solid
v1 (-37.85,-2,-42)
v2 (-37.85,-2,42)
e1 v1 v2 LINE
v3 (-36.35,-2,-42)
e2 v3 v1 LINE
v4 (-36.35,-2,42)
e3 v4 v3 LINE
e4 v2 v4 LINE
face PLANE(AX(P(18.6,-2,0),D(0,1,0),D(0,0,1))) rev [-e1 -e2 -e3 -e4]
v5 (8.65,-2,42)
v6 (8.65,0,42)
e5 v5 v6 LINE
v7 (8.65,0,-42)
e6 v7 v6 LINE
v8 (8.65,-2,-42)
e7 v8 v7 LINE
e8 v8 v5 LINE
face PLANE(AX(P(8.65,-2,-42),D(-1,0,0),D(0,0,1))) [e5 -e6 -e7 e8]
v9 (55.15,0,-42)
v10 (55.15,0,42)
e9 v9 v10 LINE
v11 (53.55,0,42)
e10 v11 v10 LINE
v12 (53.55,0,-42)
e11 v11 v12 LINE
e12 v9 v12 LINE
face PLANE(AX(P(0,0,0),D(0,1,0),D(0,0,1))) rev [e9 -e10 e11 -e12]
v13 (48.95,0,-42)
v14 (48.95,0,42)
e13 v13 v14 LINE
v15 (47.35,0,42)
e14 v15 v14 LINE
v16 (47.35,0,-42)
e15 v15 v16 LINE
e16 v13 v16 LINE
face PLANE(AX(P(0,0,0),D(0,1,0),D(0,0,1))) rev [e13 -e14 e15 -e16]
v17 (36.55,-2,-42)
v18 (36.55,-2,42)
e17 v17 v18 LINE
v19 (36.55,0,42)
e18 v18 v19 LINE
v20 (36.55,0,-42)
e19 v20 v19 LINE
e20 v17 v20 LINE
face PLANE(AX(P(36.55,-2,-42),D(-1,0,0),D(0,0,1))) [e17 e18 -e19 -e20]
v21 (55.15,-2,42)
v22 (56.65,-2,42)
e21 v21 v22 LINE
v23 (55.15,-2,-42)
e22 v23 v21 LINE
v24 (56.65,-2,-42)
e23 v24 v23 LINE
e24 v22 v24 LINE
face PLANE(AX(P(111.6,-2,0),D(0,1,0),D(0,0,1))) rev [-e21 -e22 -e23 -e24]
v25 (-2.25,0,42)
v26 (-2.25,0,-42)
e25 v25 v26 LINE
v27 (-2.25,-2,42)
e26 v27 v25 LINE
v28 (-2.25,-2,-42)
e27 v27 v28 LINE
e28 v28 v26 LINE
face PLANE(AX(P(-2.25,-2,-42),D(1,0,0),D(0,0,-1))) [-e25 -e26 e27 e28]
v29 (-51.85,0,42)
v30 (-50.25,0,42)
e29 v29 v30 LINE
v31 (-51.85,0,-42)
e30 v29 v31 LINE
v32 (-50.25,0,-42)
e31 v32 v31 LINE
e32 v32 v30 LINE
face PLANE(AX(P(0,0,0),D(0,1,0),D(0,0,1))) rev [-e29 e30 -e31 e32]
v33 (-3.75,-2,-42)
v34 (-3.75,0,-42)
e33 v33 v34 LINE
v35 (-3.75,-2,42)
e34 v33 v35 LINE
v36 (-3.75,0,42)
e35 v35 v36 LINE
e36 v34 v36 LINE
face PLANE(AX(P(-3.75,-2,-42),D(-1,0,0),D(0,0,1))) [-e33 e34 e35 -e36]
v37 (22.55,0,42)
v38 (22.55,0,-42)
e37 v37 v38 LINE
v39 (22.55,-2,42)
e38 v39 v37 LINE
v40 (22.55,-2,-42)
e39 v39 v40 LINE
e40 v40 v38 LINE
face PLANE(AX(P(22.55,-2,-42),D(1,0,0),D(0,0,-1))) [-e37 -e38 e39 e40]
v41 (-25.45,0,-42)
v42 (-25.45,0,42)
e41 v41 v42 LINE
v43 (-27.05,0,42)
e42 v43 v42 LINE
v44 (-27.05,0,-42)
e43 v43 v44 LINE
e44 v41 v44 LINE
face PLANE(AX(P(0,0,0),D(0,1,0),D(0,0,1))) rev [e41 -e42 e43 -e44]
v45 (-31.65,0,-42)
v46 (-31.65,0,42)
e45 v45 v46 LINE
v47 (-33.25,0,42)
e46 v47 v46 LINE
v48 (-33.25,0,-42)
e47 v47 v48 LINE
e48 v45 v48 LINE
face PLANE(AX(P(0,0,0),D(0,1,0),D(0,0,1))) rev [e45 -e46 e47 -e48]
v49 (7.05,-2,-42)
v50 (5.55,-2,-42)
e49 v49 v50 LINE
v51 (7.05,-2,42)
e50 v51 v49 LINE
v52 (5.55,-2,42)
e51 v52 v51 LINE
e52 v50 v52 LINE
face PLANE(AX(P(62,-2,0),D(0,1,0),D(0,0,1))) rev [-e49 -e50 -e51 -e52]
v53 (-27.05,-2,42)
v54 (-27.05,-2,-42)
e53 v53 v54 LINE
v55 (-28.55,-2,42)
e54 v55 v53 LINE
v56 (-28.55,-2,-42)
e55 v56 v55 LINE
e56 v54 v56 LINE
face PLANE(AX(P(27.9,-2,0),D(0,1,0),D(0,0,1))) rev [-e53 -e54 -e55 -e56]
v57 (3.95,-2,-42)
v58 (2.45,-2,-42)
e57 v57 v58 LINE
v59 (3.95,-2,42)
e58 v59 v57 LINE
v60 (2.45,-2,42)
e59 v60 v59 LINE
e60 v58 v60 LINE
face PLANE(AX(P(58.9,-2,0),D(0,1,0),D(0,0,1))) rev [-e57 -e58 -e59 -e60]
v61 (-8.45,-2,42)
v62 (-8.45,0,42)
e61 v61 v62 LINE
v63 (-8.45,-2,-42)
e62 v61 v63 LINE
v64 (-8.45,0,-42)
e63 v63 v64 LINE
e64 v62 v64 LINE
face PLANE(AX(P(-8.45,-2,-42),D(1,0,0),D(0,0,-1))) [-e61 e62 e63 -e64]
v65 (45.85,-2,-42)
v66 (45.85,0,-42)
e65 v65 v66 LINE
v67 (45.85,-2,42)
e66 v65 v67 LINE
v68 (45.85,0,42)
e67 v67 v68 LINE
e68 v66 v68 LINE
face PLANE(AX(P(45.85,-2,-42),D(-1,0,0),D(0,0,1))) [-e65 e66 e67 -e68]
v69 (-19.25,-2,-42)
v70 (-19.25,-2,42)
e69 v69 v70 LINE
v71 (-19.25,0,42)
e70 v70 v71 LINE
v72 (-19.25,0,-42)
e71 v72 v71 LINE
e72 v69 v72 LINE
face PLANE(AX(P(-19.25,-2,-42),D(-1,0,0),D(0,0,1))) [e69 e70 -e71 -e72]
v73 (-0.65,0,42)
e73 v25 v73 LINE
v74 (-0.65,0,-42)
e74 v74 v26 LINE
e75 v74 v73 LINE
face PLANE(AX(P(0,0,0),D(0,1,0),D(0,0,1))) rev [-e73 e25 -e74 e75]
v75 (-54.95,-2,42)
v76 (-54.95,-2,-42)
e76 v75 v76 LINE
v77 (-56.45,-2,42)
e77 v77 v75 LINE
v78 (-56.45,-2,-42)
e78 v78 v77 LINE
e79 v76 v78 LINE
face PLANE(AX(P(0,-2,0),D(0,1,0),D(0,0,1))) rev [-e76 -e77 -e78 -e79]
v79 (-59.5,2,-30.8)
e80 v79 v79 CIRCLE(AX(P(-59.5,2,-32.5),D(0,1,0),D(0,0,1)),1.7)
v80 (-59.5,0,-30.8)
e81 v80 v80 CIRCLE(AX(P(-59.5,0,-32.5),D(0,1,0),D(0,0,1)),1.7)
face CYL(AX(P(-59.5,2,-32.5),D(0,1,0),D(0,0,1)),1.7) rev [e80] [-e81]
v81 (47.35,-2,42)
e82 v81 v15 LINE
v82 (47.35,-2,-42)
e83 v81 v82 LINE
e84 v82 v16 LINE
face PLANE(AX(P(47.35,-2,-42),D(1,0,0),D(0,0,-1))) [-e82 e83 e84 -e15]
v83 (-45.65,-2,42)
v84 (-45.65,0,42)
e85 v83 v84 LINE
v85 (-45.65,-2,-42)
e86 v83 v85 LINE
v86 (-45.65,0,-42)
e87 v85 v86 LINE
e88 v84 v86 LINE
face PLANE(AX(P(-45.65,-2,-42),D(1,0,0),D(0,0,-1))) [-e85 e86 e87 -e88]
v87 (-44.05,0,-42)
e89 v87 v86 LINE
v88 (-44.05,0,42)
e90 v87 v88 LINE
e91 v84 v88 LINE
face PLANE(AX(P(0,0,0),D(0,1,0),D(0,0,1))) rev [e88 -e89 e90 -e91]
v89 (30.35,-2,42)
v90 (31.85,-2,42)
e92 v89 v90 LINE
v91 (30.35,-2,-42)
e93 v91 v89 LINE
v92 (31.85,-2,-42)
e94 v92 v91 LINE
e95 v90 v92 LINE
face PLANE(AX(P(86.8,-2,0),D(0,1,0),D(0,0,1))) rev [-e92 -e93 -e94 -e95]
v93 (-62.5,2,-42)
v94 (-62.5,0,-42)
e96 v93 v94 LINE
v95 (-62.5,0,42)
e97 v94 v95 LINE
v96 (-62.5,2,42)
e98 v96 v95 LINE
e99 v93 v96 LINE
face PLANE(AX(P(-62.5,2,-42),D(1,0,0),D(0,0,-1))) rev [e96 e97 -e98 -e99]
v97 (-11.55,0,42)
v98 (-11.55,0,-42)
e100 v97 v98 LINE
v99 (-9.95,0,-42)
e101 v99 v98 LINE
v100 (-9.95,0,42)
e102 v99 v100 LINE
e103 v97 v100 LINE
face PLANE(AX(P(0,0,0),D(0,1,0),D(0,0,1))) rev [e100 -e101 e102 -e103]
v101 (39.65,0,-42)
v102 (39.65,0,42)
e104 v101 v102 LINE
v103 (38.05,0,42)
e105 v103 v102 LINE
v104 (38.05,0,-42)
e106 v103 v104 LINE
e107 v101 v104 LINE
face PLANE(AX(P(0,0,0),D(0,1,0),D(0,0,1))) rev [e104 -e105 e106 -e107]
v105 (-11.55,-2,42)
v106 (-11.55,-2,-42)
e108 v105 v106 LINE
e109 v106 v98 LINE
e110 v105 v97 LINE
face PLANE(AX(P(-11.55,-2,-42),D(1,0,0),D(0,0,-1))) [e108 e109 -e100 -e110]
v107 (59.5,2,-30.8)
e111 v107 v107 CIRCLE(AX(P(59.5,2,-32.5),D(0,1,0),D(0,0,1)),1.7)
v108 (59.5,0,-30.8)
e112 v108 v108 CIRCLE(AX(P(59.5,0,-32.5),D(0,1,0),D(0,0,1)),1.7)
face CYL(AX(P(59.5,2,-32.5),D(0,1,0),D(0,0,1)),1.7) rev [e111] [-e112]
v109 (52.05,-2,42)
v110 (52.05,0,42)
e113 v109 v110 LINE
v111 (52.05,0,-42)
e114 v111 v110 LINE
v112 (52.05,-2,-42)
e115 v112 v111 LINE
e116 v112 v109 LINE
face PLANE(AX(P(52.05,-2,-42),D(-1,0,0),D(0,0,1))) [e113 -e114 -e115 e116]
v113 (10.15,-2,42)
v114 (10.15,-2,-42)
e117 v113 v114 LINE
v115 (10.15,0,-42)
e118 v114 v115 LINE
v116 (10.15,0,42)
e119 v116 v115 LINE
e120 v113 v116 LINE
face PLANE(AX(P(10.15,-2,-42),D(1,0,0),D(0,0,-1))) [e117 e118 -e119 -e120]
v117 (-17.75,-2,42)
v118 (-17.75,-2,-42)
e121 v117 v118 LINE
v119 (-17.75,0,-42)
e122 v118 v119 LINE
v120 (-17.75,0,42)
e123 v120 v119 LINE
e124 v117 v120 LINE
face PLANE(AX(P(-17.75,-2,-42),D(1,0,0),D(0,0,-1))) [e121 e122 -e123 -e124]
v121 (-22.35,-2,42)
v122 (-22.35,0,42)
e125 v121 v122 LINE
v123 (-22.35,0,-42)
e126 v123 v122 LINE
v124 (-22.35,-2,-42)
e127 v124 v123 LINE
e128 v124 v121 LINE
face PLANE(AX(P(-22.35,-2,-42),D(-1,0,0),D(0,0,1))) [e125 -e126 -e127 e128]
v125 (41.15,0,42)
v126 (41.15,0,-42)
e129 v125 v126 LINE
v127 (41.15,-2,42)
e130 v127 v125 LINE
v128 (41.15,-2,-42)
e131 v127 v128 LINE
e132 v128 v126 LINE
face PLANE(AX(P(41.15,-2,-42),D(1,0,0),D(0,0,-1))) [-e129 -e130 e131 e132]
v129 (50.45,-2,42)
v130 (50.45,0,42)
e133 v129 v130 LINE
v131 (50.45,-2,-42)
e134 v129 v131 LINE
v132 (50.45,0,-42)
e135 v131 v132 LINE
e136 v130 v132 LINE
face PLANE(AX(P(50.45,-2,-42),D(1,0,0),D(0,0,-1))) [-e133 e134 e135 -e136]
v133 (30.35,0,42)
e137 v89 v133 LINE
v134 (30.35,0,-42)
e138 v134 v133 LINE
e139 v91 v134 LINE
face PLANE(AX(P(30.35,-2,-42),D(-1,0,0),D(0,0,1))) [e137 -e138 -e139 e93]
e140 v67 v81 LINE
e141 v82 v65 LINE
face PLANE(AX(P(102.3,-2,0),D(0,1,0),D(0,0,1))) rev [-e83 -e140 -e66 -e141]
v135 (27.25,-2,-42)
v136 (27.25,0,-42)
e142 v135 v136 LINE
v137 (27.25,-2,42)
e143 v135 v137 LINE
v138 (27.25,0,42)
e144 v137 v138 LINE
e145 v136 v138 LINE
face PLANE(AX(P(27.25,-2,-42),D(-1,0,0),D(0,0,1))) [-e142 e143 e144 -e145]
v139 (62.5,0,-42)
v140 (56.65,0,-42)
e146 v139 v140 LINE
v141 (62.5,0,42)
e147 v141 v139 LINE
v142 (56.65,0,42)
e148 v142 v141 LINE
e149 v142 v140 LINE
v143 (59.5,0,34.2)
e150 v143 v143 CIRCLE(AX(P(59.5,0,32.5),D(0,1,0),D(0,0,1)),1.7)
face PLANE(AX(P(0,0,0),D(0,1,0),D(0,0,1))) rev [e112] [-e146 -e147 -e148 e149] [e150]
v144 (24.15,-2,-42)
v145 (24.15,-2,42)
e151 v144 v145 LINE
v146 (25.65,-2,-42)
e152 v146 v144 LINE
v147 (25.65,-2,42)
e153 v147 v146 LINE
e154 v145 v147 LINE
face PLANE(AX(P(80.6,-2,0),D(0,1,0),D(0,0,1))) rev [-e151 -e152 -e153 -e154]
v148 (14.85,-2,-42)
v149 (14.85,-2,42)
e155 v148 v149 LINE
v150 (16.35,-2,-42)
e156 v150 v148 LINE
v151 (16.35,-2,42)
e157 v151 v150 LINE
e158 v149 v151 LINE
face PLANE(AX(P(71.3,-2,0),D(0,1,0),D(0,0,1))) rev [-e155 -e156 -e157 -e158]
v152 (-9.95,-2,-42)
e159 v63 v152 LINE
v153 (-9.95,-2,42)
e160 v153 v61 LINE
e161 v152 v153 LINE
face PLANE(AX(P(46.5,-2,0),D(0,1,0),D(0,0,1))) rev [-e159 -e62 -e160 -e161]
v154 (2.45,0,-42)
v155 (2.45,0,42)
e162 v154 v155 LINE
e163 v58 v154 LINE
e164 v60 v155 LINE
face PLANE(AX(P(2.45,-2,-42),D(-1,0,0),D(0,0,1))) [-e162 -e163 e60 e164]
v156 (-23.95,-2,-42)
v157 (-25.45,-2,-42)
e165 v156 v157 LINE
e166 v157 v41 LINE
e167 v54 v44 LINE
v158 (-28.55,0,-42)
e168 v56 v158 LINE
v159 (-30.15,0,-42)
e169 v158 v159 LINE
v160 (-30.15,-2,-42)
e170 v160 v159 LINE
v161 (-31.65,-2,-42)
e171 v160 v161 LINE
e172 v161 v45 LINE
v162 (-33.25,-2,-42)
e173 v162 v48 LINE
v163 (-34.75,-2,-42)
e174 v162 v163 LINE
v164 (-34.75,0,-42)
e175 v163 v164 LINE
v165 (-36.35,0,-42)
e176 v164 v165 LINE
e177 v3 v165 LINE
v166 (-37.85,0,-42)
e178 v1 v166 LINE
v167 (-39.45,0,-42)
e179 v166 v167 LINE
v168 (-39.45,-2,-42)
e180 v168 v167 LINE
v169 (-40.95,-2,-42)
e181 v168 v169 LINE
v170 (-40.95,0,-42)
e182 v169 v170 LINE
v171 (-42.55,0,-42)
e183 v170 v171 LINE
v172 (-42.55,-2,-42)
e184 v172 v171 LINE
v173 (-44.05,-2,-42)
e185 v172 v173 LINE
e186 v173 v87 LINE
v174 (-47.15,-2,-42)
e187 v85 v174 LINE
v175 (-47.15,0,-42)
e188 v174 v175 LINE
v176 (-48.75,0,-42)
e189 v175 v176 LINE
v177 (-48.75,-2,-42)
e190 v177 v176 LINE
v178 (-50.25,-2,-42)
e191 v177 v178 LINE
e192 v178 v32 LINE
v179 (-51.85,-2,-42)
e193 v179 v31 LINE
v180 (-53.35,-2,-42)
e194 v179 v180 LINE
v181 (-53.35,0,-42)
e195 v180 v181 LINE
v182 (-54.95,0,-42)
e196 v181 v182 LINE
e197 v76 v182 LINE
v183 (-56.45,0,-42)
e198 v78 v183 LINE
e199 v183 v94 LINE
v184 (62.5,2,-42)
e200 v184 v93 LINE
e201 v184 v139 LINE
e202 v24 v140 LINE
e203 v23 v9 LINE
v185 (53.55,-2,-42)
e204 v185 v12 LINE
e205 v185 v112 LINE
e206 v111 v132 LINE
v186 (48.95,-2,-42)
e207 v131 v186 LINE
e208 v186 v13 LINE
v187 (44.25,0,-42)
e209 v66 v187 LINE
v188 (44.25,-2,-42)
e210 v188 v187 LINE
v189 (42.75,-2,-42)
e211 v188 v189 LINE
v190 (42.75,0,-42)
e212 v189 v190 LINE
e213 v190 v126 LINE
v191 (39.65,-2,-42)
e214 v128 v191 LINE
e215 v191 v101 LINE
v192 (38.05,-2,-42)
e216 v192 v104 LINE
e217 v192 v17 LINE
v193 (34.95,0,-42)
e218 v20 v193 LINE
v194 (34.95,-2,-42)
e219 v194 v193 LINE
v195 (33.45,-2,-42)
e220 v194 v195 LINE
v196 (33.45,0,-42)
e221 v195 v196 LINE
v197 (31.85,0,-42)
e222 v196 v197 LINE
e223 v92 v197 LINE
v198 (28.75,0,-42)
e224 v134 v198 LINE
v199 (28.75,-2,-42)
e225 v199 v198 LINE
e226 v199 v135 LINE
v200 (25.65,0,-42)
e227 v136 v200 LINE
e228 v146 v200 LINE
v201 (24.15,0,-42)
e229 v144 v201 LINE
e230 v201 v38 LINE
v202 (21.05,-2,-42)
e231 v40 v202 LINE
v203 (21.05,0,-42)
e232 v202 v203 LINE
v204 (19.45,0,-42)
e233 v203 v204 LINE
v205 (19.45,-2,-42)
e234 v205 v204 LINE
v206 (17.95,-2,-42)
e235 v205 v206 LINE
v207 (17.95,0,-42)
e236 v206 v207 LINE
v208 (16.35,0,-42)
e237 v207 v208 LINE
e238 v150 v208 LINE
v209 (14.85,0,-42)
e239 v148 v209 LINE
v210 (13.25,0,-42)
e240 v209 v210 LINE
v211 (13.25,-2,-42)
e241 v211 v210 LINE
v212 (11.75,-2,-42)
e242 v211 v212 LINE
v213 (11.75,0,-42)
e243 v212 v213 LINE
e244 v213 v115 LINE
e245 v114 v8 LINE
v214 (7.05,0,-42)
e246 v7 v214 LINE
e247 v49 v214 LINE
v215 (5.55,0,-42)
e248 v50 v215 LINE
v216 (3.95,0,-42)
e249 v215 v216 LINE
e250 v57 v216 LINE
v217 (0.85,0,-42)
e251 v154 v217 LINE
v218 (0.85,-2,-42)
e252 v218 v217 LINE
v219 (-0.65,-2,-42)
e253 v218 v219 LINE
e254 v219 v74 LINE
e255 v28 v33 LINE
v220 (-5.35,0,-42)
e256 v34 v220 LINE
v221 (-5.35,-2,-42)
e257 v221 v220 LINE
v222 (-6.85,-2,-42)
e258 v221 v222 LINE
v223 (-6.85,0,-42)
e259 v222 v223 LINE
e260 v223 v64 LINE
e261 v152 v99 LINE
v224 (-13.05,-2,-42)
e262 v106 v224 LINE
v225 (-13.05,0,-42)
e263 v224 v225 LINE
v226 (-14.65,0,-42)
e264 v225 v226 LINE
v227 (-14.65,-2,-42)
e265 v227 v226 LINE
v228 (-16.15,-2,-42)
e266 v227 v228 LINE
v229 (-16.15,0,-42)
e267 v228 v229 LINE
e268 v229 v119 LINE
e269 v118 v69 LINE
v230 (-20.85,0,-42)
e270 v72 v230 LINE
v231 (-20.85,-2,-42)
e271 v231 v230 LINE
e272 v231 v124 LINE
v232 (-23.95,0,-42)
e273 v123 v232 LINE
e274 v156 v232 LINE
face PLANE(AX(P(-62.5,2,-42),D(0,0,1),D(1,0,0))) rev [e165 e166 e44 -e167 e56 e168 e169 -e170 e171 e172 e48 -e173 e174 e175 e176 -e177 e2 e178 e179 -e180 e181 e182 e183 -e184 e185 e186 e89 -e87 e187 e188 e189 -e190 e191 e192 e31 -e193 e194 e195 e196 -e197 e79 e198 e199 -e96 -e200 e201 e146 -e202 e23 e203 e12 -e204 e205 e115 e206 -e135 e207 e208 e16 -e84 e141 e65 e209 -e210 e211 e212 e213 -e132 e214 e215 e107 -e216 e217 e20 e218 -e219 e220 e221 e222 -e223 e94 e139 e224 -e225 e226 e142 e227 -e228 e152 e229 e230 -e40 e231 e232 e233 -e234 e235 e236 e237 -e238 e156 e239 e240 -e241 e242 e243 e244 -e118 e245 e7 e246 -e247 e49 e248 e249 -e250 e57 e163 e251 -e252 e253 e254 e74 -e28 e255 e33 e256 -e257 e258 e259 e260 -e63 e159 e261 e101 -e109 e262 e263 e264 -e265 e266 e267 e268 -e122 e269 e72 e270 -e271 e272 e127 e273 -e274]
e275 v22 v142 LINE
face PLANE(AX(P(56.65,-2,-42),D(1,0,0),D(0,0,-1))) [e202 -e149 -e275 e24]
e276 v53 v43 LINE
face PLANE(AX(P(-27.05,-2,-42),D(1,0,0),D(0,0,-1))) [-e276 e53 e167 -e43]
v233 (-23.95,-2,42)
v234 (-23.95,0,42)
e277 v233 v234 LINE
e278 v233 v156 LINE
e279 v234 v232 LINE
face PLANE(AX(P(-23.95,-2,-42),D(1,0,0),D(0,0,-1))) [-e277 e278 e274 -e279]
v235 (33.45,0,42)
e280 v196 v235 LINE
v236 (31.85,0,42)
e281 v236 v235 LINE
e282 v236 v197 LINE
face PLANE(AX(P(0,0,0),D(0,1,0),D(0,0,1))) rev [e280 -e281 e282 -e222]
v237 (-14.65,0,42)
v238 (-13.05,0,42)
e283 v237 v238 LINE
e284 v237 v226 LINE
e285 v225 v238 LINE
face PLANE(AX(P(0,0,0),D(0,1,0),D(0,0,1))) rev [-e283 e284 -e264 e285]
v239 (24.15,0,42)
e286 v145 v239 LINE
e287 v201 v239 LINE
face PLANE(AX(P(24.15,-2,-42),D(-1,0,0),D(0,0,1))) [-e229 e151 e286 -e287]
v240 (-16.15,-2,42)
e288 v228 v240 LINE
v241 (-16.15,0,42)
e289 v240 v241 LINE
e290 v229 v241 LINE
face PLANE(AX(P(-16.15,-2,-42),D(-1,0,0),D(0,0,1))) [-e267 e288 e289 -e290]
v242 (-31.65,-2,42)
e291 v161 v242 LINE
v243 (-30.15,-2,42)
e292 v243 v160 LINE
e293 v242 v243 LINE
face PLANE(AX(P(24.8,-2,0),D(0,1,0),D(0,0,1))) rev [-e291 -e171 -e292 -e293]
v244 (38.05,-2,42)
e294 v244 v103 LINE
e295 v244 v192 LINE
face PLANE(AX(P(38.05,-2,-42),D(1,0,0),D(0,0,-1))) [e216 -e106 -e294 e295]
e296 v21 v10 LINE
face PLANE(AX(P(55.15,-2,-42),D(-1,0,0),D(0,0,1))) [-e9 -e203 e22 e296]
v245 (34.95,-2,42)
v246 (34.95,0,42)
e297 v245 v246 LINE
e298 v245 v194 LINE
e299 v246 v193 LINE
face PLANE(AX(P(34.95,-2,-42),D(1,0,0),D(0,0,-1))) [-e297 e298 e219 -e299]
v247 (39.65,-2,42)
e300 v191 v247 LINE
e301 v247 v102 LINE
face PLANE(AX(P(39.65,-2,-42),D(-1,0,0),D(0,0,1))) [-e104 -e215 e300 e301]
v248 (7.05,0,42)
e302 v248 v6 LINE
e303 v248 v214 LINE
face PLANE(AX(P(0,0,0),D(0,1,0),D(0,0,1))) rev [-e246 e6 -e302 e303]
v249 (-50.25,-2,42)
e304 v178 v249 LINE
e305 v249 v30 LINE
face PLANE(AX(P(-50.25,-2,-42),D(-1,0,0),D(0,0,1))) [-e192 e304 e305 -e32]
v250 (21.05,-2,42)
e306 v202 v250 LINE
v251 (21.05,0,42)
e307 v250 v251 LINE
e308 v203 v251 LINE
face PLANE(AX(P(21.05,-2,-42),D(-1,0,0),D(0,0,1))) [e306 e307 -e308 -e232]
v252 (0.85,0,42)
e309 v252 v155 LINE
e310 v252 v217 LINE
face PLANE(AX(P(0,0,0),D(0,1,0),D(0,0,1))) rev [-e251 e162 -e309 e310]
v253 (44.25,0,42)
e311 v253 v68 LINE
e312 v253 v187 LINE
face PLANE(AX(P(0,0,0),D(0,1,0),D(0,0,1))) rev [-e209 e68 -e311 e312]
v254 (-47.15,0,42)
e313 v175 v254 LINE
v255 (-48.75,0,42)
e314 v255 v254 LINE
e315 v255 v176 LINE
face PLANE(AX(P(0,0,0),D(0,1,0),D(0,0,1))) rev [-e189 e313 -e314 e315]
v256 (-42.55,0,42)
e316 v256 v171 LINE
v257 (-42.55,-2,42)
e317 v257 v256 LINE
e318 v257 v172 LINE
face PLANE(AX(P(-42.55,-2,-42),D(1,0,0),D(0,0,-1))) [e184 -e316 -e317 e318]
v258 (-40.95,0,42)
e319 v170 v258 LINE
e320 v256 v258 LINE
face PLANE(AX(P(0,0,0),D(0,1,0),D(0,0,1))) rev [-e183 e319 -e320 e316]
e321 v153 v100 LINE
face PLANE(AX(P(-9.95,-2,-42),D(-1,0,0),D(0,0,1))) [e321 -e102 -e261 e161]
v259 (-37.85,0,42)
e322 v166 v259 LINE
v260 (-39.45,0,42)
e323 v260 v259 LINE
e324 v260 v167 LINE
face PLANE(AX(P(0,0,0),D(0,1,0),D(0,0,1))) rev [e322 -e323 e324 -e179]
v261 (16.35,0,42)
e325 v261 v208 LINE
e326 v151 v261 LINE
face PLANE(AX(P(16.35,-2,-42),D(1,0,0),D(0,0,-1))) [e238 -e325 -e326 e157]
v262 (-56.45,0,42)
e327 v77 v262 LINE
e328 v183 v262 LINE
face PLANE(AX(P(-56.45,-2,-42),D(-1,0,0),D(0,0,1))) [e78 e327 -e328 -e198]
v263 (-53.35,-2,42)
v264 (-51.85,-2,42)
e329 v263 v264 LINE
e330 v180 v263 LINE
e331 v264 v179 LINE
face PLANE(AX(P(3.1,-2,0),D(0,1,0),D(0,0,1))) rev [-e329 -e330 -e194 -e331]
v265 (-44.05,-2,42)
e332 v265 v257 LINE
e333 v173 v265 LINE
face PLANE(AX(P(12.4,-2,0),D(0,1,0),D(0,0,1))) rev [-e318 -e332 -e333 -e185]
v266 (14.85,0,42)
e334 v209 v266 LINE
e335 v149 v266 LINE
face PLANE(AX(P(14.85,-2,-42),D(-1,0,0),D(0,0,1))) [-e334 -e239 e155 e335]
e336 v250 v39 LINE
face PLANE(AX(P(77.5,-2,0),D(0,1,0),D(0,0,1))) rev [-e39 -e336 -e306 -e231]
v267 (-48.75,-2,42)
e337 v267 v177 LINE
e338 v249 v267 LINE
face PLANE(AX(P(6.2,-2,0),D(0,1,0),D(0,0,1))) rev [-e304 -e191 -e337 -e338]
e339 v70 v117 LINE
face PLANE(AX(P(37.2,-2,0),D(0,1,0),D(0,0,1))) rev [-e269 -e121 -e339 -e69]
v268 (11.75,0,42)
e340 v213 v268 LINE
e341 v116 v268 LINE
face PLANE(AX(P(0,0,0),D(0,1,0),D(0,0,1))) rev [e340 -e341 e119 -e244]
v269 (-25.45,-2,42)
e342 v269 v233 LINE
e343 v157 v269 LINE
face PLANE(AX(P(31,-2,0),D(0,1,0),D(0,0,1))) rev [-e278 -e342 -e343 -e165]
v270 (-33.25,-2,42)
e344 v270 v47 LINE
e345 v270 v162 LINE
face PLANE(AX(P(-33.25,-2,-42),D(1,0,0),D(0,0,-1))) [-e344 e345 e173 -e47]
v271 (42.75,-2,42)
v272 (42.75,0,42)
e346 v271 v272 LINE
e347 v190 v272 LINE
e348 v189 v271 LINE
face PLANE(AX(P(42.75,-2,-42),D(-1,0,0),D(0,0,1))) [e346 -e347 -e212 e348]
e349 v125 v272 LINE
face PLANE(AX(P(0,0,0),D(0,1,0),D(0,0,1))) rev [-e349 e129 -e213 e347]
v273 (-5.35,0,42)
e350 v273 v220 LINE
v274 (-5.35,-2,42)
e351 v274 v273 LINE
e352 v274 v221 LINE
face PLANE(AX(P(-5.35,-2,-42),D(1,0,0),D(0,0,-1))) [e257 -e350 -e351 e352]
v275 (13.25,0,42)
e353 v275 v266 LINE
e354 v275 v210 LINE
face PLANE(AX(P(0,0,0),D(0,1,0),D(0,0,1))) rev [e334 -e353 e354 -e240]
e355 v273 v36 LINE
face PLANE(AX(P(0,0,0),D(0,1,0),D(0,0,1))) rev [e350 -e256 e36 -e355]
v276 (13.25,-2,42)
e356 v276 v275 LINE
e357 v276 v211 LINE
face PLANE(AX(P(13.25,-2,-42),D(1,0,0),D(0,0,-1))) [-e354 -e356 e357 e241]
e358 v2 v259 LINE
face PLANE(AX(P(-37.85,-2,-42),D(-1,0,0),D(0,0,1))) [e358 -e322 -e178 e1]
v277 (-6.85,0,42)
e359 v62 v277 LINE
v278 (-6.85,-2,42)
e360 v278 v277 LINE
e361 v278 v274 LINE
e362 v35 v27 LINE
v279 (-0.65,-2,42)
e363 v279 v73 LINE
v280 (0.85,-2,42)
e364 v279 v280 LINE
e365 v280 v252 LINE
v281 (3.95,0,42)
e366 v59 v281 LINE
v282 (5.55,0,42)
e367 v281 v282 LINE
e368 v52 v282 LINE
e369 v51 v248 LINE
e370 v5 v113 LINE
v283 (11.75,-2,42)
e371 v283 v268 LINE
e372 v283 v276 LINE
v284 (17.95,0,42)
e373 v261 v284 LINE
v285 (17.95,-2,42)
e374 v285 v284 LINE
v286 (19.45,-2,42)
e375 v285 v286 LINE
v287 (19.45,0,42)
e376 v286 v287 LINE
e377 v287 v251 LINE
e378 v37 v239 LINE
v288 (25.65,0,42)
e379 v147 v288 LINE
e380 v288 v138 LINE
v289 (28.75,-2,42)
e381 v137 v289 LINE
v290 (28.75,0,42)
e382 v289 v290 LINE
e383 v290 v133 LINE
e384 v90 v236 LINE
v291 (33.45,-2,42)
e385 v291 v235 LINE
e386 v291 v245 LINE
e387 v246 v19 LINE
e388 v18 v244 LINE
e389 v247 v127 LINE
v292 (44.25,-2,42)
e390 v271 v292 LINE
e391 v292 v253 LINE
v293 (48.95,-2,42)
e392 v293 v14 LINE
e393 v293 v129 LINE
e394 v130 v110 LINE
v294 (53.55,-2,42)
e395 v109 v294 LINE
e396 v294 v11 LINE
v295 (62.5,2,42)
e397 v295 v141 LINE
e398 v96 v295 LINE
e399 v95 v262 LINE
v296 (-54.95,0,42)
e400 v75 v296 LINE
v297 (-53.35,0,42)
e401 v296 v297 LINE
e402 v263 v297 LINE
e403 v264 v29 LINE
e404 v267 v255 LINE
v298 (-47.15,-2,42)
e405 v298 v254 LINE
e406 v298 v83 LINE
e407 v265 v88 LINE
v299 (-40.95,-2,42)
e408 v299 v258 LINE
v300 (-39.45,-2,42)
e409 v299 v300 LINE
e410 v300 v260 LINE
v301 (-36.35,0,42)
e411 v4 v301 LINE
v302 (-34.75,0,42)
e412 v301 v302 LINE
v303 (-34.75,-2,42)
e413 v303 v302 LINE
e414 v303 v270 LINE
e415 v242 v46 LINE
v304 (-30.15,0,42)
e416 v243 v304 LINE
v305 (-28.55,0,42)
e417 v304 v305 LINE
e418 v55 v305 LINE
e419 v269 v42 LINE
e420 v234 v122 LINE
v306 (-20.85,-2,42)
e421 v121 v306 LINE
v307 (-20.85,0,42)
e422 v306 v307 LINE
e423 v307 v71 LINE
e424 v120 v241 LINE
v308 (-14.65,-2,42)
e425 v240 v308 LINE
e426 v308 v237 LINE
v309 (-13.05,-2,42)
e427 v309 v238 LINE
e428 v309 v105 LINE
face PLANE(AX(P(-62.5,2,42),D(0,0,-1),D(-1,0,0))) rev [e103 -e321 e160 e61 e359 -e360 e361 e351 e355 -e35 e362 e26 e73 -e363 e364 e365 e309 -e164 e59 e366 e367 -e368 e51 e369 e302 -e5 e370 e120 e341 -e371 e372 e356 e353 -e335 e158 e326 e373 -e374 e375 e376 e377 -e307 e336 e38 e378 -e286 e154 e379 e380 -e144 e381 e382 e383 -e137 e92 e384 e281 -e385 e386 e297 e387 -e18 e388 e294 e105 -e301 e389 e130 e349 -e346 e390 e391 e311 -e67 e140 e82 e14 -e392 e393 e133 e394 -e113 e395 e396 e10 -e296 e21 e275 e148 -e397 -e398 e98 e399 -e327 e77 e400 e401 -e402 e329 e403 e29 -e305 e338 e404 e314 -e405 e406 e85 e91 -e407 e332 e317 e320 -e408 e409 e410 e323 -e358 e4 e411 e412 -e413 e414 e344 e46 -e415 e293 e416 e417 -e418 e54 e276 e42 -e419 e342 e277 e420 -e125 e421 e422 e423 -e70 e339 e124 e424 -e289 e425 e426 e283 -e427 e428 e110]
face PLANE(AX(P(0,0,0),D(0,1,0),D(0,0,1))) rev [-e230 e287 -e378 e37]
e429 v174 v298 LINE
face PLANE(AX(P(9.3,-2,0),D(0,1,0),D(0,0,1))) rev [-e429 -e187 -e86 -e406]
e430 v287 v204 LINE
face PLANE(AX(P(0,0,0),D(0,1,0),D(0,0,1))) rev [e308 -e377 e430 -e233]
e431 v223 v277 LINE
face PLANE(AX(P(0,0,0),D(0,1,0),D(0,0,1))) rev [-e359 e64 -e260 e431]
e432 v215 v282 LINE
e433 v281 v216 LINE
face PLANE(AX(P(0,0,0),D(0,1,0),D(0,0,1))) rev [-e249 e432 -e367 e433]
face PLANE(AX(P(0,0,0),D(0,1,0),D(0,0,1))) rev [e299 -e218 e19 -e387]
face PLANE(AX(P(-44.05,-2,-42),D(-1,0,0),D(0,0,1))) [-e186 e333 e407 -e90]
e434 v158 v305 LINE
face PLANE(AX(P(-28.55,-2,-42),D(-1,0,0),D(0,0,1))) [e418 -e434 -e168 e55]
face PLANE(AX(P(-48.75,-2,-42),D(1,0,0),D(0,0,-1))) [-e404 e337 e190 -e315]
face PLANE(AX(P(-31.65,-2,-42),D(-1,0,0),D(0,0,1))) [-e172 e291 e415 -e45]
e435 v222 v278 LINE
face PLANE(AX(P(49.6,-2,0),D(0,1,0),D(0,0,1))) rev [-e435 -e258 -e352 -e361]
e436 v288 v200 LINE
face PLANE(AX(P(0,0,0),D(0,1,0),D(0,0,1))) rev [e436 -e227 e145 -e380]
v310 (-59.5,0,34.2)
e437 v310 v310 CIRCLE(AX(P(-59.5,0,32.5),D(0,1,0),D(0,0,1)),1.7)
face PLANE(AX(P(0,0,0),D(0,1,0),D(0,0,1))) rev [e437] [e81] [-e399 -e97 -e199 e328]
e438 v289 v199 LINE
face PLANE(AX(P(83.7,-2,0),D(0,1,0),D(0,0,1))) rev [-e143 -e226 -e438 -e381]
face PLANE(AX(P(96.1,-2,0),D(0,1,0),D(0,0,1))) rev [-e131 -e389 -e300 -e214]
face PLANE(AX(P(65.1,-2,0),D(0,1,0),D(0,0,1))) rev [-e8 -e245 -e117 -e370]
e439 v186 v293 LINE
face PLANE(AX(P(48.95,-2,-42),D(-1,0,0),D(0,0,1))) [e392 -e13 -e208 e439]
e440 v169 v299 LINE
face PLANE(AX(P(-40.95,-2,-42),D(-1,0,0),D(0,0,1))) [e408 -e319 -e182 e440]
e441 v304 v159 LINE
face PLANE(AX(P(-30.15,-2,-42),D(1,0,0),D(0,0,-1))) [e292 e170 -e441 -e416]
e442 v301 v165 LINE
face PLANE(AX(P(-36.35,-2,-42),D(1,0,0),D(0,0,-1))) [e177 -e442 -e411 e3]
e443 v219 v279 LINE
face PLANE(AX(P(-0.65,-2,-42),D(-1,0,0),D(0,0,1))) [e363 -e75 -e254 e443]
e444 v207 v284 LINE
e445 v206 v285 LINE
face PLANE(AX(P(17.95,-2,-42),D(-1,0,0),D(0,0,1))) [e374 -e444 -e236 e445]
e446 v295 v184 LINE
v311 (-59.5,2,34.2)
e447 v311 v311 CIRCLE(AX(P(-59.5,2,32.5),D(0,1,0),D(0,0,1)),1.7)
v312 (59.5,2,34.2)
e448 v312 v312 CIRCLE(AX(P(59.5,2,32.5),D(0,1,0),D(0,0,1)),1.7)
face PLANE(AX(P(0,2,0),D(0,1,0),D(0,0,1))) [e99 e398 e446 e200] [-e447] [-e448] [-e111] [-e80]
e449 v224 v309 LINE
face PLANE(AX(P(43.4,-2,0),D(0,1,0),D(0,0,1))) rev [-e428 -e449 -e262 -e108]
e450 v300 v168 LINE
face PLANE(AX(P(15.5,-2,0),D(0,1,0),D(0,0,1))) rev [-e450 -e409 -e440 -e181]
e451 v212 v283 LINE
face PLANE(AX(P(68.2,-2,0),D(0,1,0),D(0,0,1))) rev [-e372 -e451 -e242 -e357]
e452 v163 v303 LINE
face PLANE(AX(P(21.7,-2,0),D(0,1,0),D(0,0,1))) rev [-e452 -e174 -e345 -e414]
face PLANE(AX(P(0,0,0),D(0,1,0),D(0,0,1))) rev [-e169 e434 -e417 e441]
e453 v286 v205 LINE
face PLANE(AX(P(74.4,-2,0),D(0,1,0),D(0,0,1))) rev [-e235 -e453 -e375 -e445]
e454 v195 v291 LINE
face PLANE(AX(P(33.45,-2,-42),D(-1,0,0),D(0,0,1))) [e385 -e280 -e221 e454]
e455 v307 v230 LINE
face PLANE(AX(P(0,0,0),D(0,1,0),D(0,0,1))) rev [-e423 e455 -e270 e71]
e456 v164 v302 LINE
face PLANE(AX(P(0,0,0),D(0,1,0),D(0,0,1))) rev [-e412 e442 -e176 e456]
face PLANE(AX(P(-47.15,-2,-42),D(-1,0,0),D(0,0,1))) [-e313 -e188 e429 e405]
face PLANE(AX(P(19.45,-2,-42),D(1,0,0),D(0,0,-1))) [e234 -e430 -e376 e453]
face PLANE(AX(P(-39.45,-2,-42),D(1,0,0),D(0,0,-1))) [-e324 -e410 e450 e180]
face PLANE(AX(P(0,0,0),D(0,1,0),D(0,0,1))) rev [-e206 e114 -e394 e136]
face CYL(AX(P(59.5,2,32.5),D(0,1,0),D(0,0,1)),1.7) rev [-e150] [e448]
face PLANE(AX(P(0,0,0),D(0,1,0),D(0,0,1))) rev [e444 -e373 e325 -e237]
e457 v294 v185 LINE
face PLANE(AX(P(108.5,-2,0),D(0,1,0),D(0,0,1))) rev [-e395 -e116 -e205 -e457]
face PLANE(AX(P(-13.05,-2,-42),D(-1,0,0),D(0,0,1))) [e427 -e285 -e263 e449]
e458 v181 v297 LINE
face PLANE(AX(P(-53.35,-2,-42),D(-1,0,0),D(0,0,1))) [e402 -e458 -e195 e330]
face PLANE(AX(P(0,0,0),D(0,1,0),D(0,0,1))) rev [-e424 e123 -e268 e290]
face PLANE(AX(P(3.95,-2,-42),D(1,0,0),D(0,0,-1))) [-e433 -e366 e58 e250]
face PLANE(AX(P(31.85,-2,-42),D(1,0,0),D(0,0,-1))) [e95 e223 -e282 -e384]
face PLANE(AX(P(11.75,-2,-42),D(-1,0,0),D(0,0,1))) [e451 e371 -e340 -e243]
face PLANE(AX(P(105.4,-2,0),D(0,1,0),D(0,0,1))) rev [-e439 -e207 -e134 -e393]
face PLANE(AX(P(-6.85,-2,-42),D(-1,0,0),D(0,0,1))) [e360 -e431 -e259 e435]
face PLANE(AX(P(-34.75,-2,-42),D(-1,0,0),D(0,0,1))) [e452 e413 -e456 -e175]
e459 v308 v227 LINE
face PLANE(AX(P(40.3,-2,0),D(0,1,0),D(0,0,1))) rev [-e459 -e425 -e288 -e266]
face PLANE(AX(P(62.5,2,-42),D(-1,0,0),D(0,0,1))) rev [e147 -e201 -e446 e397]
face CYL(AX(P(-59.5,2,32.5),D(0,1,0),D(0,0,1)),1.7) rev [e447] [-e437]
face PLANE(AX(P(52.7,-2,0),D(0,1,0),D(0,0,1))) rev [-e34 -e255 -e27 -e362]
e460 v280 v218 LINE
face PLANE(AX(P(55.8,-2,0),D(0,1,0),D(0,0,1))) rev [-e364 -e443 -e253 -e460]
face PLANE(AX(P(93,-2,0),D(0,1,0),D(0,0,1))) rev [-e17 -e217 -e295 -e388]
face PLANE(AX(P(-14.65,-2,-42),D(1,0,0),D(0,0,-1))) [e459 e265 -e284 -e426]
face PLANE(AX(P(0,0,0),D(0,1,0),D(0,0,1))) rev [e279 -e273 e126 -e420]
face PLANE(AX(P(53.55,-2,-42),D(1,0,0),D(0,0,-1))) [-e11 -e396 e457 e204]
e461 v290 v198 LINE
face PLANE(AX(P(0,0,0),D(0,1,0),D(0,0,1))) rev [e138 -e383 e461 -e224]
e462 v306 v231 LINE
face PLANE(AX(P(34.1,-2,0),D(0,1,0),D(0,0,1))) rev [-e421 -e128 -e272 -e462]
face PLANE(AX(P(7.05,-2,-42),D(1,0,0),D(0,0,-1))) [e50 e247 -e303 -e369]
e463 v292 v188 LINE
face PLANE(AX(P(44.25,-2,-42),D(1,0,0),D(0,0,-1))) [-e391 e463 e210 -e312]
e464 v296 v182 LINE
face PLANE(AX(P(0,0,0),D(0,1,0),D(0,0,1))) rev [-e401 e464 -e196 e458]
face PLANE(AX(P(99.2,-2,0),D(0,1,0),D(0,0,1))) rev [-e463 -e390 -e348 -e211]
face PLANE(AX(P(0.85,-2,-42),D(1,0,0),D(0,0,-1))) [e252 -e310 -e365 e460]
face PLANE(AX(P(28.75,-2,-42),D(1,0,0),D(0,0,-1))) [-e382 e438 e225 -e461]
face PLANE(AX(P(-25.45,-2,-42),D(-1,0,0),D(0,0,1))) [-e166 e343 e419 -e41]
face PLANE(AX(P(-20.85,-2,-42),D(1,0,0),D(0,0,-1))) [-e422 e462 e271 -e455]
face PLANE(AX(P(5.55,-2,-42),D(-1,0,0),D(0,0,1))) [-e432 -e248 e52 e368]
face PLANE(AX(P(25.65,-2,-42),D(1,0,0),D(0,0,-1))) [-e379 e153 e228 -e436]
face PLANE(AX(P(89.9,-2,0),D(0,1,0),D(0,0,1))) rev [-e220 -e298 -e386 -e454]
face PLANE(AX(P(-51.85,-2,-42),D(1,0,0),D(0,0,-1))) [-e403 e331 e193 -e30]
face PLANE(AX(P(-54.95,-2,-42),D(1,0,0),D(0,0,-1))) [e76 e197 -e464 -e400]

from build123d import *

# Parameters (mm, degrees)
SKETCH1_W               = 125
SKETCH1_H               = 84
BOSS_EXTRUDE1_DEPTH     = 2
M3_CLEARANCE_HOLE1_D    = 3.4
MIRROR2_COPY_1_D        = 3.4
SKETCH4_W               = 1.5
SKETCH4_H               = 84
BOSS_EXTRUDE2_DEPTH     = 2
FILL_START              = -42
FILL_PATTERN2_OUTLINE_W = 1.5
FILL_PATTERN2_OUTLINE_H = 2
FILL_PATTERN2_DEPTH     = 84


# Read off the part's stored shape, not the designer's step: Fill Pattern2
with BuildPart() as part:
    # Sketch1 → Boss-Extrude1 (new body)
    with BuildSketch(Plane(origin=(0, 0, 0), x_dir=(1, 0, 0), z_dir=(0, 1, 0))):
        Rectangle(SKETCH1_W, SKETCH1_H)
    extrude(amount=BOSS_EXTRUDE1_DEPTH)

    # M3 Clearance Hole1 (through all)
    with Locations(Plane(origin=(0, 2, 0), x_dir=(1, 0, 0), z_dir=(0, 1, 0))):
        with Locations((-59.5, 32.5)):
            m3_clearance_hole1 = Hole(M3_CLEARANCE_HOLE1_D / 2)

    # Mirror1: M3 Clearance Hole1 across plane
    add(m3_clearance_hole1.mirror(Plane(origin=(0, 0, 0), x_dir=(0, 0, 1), z_dir=(1, 0, 0))), mode=Mode.SUBTRACT)

    # Mirror2: M3 Clearance Hole1 across plane
    add(m3_clearance_hole1.mirror(Plane.XY), mode=Mode.SUBTRACT)

    # Mirror2 copy 1 (through all)
    with Locations(Plane(origin=(0, 2, 0), x_dir=(-1, 0, 0), z_dir=(0, 1, 0))):
        with Locations((-59.5, 32.5)):
            Hole(MIRROR2_COPY_1_D / 2)

    # Sketch4 → Boss-Extrude2 (add)
    with BuildSketch(Plane(origin=(0, 0, 0), x_dir=(1, 0, 0), z_dir=(0, 1, 0))):
        with Locations((-55.7, 0)):
            Rectangle(SKETCH4_W, SKETCH4_H)
    extrude(amount=-BOSS_EXTRUDE2_DEPTH)

    # Fill Pattern2 outline → Fill Pattern2 (add)
    with BuildSketch(Plane.XY.offset(FILL_START)):
        with Locations((55.9, -1)):
            Rectangle(FILL_PATTERN2_OUTLINE_W, FILL_PATTERN2_OUTLINE_H)
        with Locations((52.8, -1)):
            Rectangle(FILL_PATTERN2_OUTLINE_W, FILL_PATTERN2_OUTLINE_H)
        with Locations((49.7, -1)):
            Rectangle(FILL_PATTERN2_OUTLINE_W, FILL_PATTERN2_OUTLINE_H)
        with Locations((46.6, -1)):
            Rectangle(FILL_PATTERN2_OUTLINE_W, FILL_PATTERN2_OUTLINE_H)
        with Locations((43.5, -1)):
            Rectangle(FILL_PATTERN2_OUTLINE_W, FILL_PATTERN2_OUTLINE_H)
        with Locations((40.4, -1)):
            Rectangle(FILL_PATTERN2_OUTLINE_W, FILL_PATTERN2_OUTLINE_H)
        with Locations((37.3, -1)):
            Rectangle(FILL_PATTERN2_OUTLINE_W, FILL_PATTERN2_OUTLINE_H)
        with Locations((34.2, -1)):
            Rectangle(FILL_PATTERN2_OUTLINE_W, FILL_PATTERN2_OUTLINE_H)
        with Locations((31.1, -1)):
            Rectangle(FILL_PATTERN2_OUTLINE_W, FILL_PATTERN2_OUTLINE_H)
        with Locations((28, -1)):
            Rectangle(FILL_PATTERN2_OUTLINE_W, FILL_PATTERN2_OUTLINE_H)
        with Locations((24.9, -1)):
            Rectangle(FILL_PATTERN2_OUTLINE_W, FILL_PATTERN2_OUTLINE_H)
        with Locations((21.8, -1)):
            Rectangle(FILL_PATTERN2_OUTLINE_W, FILL_PATTERN2_OUTLINE_H)
        with Locations((18.7, -1)):
            Rectangle(FILL_PATTERN2_OUTLINE_W, FILL_PATTERN2_OUTLINE_H)
        with Locations((15.6, -1)):
            Rectangle(FILL_PATTERN2_OUTLINE_W, FILL_PATTERN2_OUTLINE_H)
        with Locations((12.5, -1)):
            Rectangle(FILL_PATTERN2_OUTLINE_W, FILL_PATTERN2_OUTLINE_H)
        with Locations((9.4, -1)):
            Rectangle(FILL_PATTERN2_OUTLINE_W, FILL_PATTERN2_OUTLINE_H)
        with Locations((6.3, -1)):
            Rectangle(FILL_PATTERN2_OUTLINE_W, FILL_PATTERN2_OUTLINE_H)
        with Locations((3.2, -1)):
            Rectangle(FILL_PATTERN2_OUTLINE_W, FILL_PATTERN2_OUTLINE_H)
        with Locations((0.1, -1)):
            Rectangle(FILL_PATTERN2_OUTLINE_W, FILL_PATTERN2_OUTLINE_H)
        with Locations((-3, -1)):
            Rectangle(FILL_PATTERN2_OUTLINE_W, FILL_PATTERN2_OUTLINE_H)
        with Locations((-6.1, -1)):
            Rectangle(FILL_PATTERN2_OUTLINE_W, FILL_PATTERN2_OUTLINE_H)
        with Locations((-9.2, -1)):
            Rectangle(FILL_PATTERN2_OUTLINE_W, FILL_PATTERN2_OUTLINE_H)
        with Locations((-12.3, -1)):
            Rectangle(FILL_PATTERN2_OUTLINE_W, FILL_PATTERN2_OUTLINE_H)
        with Locations((-15.4, -1)):
            Rectangle(FILL_PATTERN2_OUTLINE_W, FILL_PATTERN2_OUTLINE_H)
        with Locations((-18.5, -1)):
            Rectangle(FILL_PATTERN2_OUTLINE_W, FILL_PATTERN2_OUTLINE_H)
        with Locations((-21.6, -1)):
            Rectangle(FILL_PATTERN2_OUTLINE_W, FILL_PATTERN2_OUTLINE_H)
        with Locations((-24.7, -1)):
            Rectangle(FILL_PATTERN2_OUTLINE_W, FILL_PATTERN2_OUTLINE_H)
        with Locations((-27.8, -1)):
            Rectangle(FILL_PATTERN2_OUTLINE_W, FILL_PATTERN2_OUTLINE_H)
        with Locations((-30.9, -1)):
            Rectangle(FILL_PATTERN2_OUTLINE_W, FILL_PATTERN2_OUTLINE_H)
        with Locations((-34, -1)):
            Rectangle(FILL_PATTERN2_OUTLINE_W, FILL_PATTERN2_OUTLINE_H)
        with Locations((-37.1, -1)):
            Rectangle(FILL_PATTERN2_OUTLINE_W, FILL_PATTERN2_OUTLINE_H)
        with Locations((-40.2, -1)):
            Rectangle(FILL_PATTERN2_OUTLINE_W, FILL_PATTERN2_OUTLINE_H)
        with Locations((-43.3, -1)):
            Rectangle(FILL_PATTERN2_OUTLINE_W, FILL_PATTERN2_OUTLINE_H)
        with Locations((-46.4, -1)):
            Rectangle(FILL_PATTERN2_OUTLINE_W, FILL_PATTERN2_OUTLINE_H)
        with Locations((-49.5, -1)):
            Rectangle(FILL_PATTERN2_OUTLINE_W, FILL_PATTERN2_OUTLINE_H)
        with Locations((-52.6, -1)):
            Rectangle(FILL_PATTERN2_OUTLINE_W, FILL_PATTERN2_OUTLINE_H)
    extrude(amount=FILL_PATTERN2_DEPTH)


solid = part.part
